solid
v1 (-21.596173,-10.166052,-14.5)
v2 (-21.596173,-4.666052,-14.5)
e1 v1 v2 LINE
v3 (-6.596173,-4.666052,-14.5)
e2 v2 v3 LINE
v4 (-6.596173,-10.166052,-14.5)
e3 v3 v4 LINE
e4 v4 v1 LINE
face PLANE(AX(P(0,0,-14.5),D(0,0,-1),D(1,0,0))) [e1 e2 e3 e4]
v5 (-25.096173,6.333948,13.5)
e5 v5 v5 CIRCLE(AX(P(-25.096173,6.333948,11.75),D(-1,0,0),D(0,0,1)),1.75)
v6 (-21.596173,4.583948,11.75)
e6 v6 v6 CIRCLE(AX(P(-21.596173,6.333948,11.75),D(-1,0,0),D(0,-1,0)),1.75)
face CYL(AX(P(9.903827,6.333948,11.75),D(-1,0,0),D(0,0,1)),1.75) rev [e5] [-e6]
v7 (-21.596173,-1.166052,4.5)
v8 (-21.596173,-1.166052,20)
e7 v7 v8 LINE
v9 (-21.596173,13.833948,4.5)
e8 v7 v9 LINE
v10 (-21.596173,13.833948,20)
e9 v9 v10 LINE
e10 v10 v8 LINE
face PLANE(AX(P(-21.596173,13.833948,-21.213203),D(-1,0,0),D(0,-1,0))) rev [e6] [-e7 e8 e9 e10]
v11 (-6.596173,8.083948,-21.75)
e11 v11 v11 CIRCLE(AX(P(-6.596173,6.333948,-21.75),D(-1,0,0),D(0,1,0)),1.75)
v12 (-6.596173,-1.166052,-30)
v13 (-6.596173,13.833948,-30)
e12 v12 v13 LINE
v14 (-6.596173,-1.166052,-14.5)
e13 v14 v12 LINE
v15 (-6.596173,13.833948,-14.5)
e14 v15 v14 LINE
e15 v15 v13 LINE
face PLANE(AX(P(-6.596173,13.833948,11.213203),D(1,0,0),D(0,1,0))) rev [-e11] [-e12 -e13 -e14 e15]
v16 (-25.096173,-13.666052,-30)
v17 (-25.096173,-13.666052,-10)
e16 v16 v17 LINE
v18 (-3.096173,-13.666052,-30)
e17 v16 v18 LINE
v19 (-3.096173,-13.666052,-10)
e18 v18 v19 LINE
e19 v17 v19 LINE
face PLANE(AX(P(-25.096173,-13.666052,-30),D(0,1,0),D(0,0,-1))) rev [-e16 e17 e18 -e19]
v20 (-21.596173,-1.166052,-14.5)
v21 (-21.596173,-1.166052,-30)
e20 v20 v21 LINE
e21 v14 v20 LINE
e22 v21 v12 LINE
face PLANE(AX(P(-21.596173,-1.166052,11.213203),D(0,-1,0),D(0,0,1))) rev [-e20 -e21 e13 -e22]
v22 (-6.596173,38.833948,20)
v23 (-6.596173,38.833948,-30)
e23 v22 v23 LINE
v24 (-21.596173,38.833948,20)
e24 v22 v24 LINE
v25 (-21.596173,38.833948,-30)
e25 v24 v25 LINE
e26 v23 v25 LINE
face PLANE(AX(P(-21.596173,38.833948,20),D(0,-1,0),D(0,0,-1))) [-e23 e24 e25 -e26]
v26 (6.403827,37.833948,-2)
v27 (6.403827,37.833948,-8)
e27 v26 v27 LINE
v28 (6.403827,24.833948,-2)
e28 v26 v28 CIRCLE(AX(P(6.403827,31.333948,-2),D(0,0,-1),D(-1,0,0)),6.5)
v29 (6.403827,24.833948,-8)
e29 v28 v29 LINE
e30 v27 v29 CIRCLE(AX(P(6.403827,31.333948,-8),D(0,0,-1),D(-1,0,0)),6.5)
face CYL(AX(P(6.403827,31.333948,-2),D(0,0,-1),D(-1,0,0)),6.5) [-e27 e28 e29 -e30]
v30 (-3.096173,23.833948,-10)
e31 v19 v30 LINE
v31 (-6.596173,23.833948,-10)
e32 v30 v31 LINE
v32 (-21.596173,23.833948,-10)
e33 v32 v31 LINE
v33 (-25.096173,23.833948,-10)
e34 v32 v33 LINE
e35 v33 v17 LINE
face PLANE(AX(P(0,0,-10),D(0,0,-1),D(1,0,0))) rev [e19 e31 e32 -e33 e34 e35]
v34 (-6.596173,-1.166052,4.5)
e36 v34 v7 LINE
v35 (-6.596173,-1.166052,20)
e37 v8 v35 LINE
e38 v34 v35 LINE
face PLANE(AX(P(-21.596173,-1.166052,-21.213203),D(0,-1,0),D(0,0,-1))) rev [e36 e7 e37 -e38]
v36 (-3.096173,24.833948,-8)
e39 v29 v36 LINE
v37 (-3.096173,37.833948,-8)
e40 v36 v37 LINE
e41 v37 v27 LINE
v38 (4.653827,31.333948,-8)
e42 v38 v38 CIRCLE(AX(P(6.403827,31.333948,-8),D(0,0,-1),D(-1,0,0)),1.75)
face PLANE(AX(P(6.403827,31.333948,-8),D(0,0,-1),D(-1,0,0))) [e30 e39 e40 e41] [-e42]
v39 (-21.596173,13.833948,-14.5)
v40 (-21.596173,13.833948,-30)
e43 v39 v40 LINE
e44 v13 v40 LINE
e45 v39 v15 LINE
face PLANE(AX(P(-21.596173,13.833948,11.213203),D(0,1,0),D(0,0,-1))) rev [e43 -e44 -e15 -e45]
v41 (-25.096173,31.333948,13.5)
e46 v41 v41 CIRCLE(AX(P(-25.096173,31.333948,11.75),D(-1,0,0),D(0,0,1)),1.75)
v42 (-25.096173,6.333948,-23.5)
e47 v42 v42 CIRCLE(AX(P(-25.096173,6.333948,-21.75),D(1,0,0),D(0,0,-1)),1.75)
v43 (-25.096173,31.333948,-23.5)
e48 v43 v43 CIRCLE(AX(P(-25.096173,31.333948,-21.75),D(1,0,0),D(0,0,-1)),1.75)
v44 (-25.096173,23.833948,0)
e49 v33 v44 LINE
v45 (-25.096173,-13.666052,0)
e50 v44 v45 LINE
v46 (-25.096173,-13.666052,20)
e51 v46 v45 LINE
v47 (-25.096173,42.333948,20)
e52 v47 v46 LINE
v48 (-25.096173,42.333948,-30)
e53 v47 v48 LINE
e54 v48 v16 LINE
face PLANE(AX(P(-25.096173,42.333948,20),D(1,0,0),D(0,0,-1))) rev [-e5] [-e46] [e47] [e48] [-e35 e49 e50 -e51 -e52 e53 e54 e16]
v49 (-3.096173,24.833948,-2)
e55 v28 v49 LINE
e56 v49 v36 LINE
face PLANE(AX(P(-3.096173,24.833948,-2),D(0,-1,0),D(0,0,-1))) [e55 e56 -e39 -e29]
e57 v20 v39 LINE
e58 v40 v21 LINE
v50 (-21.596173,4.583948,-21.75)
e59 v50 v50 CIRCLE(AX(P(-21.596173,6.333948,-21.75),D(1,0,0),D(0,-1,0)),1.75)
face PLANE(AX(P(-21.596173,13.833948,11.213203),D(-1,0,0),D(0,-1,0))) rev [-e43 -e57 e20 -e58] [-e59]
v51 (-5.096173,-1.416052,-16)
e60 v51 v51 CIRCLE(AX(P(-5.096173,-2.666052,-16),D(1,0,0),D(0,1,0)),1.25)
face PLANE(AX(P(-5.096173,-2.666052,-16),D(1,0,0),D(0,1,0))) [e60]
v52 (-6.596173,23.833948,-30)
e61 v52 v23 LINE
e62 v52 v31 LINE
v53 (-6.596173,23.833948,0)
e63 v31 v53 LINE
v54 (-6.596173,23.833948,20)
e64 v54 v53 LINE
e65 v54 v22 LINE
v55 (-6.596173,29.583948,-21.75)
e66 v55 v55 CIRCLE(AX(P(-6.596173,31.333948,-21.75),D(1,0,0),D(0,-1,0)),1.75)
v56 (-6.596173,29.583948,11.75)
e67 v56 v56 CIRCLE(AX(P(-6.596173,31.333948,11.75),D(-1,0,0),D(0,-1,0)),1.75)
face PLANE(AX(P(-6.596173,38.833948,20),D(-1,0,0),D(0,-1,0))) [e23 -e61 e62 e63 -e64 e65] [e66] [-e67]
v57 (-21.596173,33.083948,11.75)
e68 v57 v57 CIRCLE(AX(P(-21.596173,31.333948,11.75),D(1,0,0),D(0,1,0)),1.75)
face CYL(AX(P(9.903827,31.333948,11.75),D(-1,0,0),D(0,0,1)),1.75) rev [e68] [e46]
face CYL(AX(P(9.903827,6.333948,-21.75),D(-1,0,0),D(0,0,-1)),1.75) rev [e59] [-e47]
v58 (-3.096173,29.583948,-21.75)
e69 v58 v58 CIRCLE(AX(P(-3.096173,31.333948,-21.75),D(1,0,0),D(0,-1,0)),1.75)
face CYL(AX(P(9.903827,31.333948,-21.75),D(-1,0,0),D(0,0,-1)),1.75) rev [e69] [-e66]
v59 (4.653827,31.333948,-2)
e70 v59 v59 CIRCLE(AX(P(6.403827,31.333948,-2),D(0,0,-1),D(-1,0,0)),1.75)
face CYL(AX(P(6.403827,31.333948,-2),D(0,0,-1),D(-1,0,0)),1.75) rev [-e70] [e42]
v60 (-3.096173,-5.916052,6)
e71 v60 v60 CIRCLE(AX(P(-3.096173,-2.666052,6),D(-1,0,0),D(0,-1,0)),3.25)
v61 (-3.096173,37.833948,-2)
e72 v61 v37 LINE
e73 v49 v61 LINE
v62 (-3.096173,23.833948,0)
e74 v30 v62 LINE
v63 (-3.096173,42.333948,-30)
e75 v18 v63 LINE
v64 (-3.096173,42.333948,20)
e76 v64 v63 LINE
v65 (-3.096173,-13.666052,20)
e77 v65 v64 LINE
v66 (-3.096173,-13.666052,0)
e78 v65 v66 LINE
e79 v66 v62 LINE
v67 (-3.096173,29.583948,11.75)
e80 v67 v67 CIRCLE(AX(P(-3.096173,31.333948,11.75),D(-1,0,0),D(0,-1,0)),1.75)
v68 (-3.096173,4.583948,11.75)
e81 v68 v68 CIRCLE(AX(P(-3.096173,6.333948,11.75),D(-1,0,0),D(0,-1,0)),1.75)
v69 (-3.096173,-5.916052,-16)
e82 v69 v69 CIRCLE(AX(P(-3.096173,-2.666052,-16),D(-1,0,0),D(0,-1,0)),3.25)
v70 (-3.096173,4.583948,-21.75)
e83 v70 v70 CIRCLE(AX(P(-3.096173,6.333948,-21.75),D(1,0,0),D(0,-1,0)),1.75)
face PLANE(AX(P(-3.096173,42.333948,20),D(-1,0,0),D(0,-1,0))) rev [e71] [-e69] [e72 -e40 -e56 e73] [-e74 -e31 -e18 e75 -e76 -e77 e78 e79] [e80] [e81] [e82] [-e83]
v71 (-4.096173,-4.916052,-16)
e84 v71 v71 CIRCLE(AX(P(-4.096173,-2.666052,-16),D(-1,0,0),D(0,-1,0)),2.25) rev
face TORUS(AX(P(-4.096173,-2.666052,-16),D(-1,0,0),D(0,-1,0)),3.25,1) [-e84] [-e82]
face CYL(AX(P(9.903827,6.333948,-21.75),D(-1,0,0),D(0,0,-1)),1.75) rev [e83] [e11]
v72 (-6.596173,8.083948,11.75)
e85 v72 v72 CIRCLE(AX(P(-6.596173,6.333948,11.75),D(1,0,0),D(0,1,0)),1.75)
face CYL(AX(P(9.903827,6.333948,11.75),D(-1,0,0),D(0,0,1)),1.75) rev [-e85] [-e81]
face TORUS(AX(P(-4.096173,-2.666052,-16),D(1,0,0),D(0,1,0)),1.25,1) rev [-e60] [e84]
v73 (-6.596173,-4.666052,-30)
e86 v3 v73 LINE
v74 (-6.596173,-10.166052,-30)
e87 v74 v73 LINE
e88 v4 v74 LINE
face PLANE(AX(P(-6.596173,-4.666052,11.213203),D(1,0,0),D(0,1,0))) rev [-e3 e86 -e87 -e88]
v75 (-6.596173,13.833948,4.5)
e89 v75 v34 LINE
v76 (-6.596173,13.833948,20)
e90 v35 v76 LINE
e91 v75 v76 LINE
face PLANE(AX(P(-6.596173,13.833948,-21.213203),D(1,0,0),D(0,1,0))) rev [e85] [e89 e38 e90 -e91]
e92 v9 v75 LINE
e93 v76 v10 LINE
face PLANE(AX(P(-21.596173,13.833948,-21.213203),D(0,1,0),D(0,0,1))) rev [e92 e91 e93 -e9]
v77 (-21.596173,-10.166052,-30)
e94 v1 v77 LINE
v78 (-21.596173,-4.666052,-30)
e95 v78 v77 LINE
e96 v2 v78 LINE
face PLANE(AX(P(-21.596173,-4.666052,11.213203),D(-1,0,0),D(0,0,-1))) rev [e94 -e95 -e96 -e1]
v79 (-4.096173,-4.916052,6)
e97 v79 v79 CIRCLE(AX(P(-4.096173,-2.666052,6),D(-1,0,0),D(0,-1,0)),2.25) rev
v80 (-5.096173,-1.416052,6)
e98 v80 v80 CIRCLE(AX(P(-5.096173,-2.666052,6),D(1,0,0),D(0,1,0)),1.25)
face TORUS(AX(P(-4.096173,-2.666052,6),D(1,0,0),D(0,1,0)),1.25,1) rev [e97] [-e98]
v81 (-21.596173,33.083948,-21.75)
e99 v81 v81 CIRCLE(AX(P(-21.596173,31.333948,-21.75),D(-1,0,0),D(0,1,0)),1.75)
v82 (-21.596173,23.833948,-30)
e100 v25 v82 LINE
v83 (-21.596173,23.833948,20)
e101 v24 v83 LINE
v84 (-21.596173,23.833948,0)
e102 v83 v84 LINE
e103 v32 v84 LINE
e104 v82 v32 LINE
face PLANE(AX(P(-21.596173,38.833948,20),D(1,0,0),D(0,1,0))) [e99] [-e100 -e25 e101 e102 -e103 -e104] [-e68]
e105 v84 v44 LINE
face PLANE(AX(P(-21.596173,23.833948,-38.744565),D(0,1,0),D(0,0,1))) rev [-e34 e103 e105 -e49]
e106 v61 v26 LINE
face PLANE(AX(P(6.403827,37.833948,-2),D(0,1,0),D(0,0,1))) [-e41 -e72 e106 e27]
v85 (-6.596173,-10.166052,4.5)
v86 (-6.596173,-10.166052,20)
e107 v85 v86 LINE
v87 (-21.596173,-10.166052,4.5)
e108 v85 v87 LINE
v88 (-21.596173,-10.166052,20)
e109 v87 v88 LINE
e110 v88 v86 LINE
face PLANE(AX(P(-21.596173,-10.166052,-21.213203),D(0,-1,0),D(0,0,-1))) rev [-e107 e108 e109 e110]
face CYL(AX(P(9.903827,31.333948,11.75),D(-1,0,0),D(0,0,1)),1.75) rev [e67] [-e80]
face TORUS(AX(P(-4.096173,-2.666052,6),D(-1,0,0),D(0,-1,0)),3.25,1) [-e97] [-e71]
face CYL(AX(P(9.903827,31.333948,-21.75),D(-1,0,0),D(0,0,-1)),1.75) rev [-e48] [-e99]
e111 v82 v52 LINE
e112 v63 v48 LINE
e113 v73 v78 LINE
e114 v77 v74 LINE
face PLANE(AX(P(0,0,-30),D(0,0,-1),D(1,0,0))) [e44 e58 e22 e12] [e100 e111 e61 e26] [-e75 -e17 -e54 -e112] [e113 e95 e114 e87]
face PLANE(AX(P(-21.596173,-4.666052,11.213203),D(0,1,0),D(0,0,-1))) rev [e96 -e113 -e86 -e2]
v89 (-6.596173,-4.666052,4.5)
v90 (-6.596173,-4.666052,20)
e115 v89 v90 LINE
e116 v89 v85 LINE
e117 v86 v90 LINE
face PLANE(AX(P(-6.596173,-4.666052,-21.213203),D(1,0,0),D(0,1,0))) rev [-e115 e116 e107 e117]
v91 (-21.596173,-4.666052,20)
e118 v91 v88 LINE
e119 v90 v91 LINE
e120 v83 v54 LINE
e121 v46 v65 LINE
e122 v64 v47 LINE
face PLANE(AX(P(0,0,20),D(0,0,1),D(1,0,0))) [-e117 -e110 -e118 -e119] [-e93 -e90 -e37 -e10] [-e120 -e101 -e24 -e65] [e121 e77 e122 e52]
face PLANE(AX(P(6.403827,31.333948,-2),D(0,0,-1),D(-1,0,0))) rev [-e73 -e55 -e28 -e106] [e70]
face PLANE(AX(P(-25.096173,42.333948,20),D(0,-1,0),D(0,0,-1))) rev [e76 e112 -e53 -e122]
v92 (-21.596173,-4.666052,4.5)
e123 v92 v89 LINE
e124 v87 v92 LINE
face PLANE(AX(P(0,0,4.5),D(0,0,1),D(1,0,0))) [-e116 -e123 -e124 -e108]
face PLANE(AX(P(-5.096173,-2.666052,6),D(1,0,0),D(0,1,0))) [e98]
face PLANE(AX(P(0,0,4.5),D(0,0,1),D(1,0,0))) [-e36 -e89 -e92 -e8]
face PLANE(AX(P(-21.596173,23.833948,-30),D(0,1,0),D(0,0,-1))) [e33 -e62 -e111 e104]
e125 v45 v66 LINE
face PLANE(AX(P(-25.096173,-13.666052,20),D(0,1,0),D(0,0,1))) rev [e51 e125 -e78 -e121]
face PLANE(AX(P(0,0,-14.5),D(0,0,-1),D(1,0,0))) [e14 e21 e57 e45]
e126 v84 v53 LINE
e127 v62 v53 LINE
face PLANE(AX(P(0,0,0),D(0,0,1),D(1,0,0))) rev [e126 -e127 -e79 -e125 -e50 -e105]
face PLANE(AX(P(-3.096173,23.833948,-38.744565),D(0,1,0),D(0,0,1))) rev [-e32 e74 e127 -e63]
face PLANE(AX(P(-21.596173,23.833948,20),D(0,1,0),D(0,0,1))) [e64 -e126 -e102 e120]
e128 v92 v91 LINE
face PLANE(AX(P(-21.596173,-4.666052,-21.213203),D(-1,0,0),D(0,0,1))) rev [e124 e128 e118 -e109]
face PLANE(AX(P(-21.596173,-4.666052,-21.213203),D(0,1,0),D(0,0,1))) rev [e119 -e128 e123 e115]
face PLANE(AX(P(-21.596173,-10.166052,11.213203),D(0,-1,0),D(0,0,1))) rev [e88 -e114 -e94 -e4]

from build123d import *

# Parameters (mm, degrees)
SKETCH1_W                = 22
SKETCH1_H                = 56
SKETCH1_W_2              = 15
SKETCH1_H_2              = 15
BOSS_EXTRUDE1_DEPTH      = 20
SKETCH2_W                = 15
SKETCH2_H                = 15
SKETCH2_H_2              = 5.5
CUT_EXTRUDE1_DEPTH       = 15.5
SKETCH3_R                = 1.75
CUT_EXTRUDE2_DEPTH       = 35
BOSS_EXTRUDE2_DEPTH      = 10
BOSS_EXTRUDE3_DEPTH      = 3
BOSS_EXTRUDE3_DEPTH_BACK = 3
SKETCH6_R                = 1.75
SKETCH7_R                = 2.25
CUT_EXTRUDE3_DEPTH       = 2
FILLET1_R                = 1


with BuildPart() as part:
    # Sketch1 → Boss-Extrude1 (new body)
    with BuildSketch(Plane.XY):
        with Locations((-14.096172604, 14.333947726)):
            Rectangle(SKETCH1_W, SKETCH1_H)
        with Locations((-14.096172604, 31.333947726)):
            Rectangle(SKETCH1_W_2, SKETCH1_H_2, mode=Mode.SUBTRACT)
    extrude(amount=BOSS_EXTRUDE1_DEPTH)

    # Sketch2 → Cut-Extrude1 (cut)
    with BuildSketch(Plane.XY.offset(20)):
        with Locations((-14.096172604, 6.333947726)):
            Rectangle(SKETCH2_W, SKETCH2_H)
        with Locations((-14.096172604, -7.416052274)):
            Rectangle(SKETCH2_W, SKETCH2_H_2)
    extrude(amount=-CUT_EXTRUDE1_DEPTH, mode=Mode.SUBTRACT)

    # Sketch3 → Cut-Extrude2 (cut)
    with BuildSketch(Plane.ZY.offset(25.096172604)):
        with Locations(Location((11.75, 31.333947726, 0), (0, 0, 270))):
            Circle(SKETCH3_R)
        with Locations(Location((11.75, 6.333947726, 0), (0, 0, 90))):
            Circle(SKETCH3_R)
    extrude(amount=-CUT_EXTRUDE2_DEPTH, mode=Mode.SUBTRACT)


with BuildPart() as body_2:
    # Mirror3: mirrored copy
    add(part.part.mirror(Plane(origin=(0, 0, -5), x_dir=(1, 0, 0), z_dir=(0, 0, -1))))


with BuildPart() as part_1:
    add(part.part)

    add(body_2.part)  # Boss-Extrude2 merges body 2
    # Sketch4 → Boss-Extrude2 (add)
    with BuildSketch(Plane(origin=(0, 0, 0), x_dir=(-1, 0, 0), z_dir=(0, 0, -1))):
        Polygon((6.596172604, 38.833947726), (21.596172604, 38.833947726), (21.596172604, 23.833947726), (25.096172604, 23.833947726), (25.096172604, 42.333947726), (3.096172604, 42.333947726), (3.096172604, 23.833947726), (6.596172604, 23.833947726), align=None)
    extrude(amount=BOSS_EXTRUDE2_DEPTH)

    # Sketch6 → Boss-Extrude3 (add, two sides: drawn at the far end of the back side and taken through both)
    with BuildSketch(Plane(origin=(0, 0, -5), x_dir=(-1, 0, 0), z_dir=(0, 0, -1)).offset(-BOSS_EXTRUDE3_DEPTH_BACK)):
        with BuildLine():
            Line((-6.403827396, 37.833947726), (3.096172604, 37.833947726))
            Line((3.096172604, 37.833947726), (3.096172604, 24.833947726))
            Line((3.096172604, 24.833947726), (-6.403827396, 24.833947726))
            ThreePointArc((-6.403827396, 24.833947726), (-12.903827396, 31.333947726), (-6.403827396, 37.833947726))
        make_face()
        with Locations((-6.403827396, 31.333947726)):
            Circle(SKETCH6_R, mode=Mode.SUBTRACT)
    extrude(amount=BOSS_EXTRUDE3_DEPTH + BOSS_EXTRUDE3_DEPTH_BACK)

    # Sketch7 → Cut-Extrude3 (cut)
    with BuildSketch(Plane(origin=(-3.096172604, 0, 0), x_dir=(0, 0, -1), z_dir=(1, 0, 0))):
        with Locations(Location((16, -2.666052274, 0), (0, 0, 90))):
            Circle(SKETCH7_R)
        with Locations(Location((-6, -2.666052274, 0), (0, 0, 90))):
            Circle(SKETCH7_R)
    extrude(amount=-CUT_EXTRUDE3_DEPTH, mode=Mode.SUBTRACT)

    # Fillet1
    fillet1_edges = [part_1.edges().sort_by_distance(p)[0] for p in [
        (-5.096172604, -4.916052274, -16),
        (-3.096172604, -4.916052274, -16),
        (-5.096172604, -4.916052274, 6),
        (-3.096172604, -4.916052274, 6),
    ]]
    fillet(fillet1_edges, radius=FILLET1_R - 0.0001)  # a hair under: the kernel refuses the full size


solid = part_1.part
